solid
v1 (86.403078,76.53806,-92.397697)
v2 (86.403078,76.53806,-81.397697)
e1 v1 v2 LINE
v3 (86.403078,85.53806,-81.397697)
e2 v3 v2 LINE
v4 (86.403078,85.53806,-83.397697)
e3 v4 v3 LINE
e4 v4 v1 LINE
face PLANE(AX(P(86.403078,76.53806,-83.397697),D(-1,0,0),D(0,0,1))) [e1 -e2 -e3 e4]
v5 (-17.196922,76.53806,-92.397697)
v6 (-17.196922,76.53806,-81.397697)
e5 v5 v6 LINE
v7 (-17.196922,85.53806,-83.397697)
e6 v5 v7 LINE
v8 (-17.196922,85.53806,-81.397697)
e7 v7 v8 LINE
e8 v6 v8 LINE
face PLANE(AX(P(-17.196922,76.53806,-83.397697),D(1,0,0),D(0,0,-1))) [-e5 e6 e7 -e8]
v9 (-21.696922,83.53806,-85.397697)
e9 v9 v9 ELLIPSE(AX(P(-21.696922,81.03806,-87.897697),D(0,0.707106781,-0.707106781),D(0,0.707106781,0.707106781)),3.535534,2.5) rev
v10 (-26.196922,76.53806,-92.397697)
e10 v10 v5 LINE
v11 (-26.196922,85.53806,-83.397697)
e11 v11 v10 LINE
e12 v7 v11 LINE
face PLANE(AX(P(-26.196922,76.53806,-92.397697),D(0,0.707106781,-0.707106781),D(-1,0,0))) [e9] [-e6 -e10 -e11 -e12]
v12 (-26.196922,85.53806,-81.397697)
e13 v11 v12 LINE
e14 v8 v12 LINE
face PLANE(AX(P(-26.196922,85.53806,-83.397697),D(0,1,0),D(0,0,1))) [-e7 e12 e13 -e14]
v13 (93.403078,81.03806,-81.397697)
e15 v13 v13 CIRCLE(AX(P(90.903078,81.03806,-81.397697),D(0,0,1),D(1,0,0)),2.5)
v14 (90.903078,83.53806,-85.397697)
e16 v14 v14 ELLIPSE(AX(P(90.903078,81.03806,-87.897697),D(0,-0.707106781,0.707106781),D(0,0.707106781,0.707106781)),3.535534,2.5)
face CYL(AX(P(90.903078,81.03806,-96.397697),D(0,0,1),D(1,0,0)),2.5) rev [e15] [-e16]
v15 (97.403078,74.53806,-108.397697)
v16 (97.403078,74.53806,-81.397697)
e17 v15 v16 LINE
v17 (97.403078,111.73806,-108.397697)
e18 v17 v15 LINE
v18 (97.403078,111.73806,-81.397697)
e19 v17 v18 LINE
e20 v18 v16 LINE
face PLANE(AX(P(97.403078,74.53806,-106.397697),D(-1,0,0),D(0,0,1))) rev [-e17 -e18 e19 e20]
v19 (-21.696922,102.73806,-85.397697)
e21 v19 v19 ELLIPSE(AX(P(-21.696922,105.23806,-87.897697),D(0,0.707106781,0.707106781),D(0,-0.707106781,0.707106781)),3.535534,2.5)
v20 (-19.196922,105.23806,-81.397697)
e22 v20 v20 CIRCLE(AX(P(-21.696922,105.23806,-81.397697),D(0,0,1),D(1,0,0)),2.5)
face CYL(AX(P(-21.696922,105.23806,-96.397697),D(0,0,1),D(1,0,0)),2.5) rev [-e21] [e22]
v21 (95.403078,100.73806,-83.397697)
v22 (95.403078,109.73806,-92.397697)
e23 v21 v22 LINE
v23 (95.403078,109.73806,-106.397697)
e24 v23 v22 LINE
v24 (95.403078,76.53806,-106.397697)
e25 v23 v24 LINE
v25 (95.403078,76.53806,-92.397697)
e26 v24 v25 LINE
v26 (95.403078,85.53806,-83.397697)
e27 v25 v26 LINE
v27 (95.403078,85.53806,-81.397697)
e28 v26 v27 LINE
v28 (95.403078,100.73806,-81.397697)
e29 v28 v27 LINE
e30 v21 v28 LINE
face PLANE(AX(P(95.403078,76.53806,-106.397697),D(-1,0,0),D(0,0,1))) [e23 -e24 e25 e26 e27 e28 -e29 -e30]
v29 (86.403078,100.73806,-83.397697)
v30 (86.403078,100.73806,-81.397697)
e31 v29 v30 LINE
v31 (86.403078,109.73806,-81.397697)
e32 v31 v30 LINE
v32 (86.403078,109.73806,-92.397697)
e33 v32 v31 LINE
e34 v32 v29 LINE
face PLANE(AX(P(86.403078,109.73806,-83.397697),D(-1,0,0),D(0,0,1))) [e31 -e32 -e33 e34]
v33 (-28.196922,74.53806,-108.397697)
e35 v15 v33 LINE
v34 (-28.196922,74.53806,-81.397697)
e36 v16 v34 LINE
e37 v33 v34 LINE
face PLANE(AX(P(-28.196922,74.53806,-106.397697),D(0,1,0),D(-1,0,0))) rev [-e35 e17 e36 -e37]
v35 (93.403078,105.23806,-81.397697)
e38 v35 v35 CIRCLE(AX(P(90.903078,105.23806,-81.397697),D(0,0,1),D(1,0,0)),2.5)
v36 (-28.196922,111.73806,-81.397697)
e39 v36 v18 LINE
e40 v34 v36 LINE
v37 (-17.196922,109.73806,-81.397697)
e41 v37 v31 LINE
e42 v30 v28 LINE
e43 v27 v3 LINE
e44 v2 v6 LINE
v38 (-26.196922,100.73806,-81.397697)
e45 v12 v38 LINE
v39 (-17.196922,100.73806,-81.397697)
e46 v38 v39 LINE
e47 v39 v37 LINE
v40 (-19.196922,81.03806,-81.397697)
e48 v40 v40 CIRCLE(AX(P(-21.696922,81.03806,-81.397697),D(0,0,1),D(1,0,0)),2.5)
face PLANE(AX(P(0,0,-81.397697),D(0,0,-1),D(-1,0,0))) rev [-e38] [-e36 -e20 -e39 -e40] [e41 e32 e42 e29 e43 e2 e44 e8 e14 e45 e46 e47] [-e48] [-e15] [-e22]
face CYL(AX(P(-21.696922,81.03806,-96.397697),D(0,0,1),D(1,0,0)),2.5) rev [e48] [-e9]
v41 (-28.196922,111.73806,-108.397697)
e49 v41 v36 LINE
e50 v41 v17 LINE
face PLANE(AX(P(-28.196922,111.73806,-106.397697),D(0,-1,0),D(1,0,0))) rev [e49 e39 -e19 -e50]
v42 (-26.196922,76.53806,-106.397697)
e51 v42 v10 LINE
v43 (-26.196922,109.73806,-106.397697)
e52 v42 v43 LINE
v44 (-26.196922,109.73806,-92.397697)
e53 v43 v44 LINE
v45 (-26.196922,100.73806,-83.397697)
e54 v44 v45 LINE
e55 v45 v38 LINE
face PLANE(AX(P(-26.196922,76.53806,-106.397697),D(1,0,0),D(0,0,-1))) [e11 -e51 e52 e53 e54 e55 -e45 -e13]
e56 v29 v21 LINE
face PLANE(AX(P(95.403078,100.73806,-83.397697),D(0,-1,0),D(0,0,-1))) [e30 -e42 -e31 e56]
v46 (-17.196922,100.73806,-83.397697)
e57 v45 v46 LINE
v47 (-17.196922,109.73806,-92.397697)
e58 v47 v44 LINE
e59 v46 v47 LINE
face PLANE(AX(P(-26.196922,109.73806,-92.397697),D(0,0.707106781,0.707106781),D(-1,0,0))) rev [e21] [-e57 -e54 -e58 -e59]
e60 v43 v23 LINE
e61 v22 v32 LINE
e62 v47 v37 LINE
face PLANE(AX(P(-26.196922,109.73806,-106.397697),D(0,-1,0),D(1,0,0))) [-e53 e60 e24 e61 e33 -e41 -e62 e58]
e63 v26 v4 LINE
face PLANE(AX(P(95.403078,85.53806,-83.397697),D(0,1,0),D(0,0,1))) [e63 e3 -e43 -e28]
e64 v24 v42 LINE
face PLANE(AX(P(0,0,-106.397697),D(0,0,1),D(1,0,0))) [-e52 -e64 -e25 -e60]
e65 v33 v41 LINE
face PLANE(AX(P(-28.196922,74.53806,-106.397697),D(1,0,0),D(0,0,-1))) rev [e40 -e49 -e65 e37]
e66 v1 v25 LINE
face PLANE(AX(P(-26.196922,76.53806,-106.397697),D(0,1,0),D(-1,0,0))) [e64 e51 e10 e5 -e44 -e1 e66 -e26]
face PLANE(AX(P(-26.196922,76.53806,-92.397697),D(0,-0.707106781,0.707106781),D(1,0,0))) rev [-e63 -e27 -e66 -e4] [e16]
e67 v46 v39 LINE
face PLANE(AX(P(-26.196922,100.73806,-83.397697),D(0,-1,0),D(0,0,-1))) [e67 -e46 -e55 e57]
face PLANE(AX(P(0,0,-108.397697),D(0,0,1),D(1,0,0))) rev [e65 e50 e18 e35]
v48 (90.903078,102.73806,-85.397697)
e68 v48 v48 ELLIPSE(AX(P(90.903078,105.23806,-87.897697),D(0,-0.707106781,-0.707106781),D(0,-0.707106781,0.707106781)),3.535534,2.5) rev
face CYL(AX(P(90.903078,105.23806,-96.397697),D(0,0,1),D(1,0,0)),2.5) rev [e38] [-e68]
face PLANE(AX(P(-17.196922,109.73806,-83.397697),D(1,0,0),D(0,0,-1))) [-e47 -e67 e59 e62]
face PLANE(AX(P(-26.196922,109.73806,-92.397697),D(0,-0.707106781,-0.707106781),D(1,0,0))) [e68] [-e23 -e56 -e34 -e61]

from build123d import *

# Parameters (mm, degrees)
SKETCH1_W           = 125.6
SKETCH1_H           = 37.2
SKETCH1_W_2         = 121.6
SKETCH1_H_2         = 33.2
BOSS_EXTRUDE1_DEPTH = 25
SKETCH2_W           = 125.6
SKETCH2_H           = 37.2
BOSS_EXTRUDE2_DEPTH = 2
SKETCH3_W           = 9
SKETCH3_H           = 9
BOSS_EXTRUDE3_DEPTH = 2
CHAMFER1_SIZE       = 9
SKETCH4_R           = 2.5
CUT_EXTRUDE1_DEPTH  = 15


with BuildPart() as part:
    # Sketch1 → Boss-Extrude1 (new body)
    with BuildSketch(Plane(origin=(0, 0, -81.397696965), x_dir=(-1, 0, 0), z_dir=(0, 0, -1))):
        with Locations((-34.603078278, 93.138059859)):
            Rectangle(SKETCH1_W, SKETCH1_H)
        with Locations((-34.603078278, 93.138059859)):
            Rectangle(SKETCH1_W_2, SKETCH1_H_2, mode=Mode.SUBTRACT)
    extrude(amount=BOSS_EXTRUDE1_DEPTH)

    # Sketch2 → Boss-Extrude2 (add)
    with BuildSketch(Plane(origin=(0, 0, -106.397696965), x_dir=(-1, 0, 0), z_dir=(0, 0, -1))):
        with Locations((-34.603078278, 93.138059859)):
            Rectangle(SKETCH2_W, SKETCH2_H)
    extrude(amount=BOSS_EXTRUDE2_DEPTH)

    # Sketch3 → Boss-Extrude3 (add)
    with BuildSketch(Plane.XY.offset(-81.397696965)):
        with Locations((90.903078278, 105.238059859)):
            Rectangle(SKETCH3_W, SKETCH3_H)
        with Locations((90.903078278, 81.038059859)):
            Rectangle(SKETCH3_W, SKETCH3_H)
        with Locations((-21.696921722, 105.238059859)):
            Rectangle(SKETCH3_W, SKETCH3_H)
        with Locations((-21.696921722, 81.038059859)):
            Rectangle(SKETCH3_W, SKETCH3_H)
    extrude(amount=-BOSS_EXTRUDE3_DEPTH)

    # Chamfer1
    chamfer1_edges = [part.edges().sort_by_distance(p)[0] for p in [
        (-21.696921722, 76.538059859, -83.397696965),
        (90.903078278, 76.538059859, -83.397696965),
        (90.903078278, 109.738059859, -83.397696965),
        (-21.696921722, 109.738059859, -83.397696965),
    ]]
    chamfer(chamfer1_edges, length=CHAMFER1_SIZE - 0.0001)  # a hair under: the kernel refuses the full size

    # Sketch4 → Cut-Extrude1 (cut)
    with BuildSketch(Plane.XY.offset(-81.397696965)):
        with Locations((-21.696921722, 105.238059859)):
            Circle(SKETCH4_R)
        with Locations((-21.696921722, 81.038059859)):
            Circle(SKETCH4_R)
        with Locations((90.903078278, 81.038059859)):
            Circle(SKETCH4_R)
        with Locations((90.903078278, 105.238059859)):
            Circle(SKETCH4_R)
    extrude(amount=-CUT_EXTRUDE1_DEPTH, mode=Mode.SUBTRACT)


solid = part.part
